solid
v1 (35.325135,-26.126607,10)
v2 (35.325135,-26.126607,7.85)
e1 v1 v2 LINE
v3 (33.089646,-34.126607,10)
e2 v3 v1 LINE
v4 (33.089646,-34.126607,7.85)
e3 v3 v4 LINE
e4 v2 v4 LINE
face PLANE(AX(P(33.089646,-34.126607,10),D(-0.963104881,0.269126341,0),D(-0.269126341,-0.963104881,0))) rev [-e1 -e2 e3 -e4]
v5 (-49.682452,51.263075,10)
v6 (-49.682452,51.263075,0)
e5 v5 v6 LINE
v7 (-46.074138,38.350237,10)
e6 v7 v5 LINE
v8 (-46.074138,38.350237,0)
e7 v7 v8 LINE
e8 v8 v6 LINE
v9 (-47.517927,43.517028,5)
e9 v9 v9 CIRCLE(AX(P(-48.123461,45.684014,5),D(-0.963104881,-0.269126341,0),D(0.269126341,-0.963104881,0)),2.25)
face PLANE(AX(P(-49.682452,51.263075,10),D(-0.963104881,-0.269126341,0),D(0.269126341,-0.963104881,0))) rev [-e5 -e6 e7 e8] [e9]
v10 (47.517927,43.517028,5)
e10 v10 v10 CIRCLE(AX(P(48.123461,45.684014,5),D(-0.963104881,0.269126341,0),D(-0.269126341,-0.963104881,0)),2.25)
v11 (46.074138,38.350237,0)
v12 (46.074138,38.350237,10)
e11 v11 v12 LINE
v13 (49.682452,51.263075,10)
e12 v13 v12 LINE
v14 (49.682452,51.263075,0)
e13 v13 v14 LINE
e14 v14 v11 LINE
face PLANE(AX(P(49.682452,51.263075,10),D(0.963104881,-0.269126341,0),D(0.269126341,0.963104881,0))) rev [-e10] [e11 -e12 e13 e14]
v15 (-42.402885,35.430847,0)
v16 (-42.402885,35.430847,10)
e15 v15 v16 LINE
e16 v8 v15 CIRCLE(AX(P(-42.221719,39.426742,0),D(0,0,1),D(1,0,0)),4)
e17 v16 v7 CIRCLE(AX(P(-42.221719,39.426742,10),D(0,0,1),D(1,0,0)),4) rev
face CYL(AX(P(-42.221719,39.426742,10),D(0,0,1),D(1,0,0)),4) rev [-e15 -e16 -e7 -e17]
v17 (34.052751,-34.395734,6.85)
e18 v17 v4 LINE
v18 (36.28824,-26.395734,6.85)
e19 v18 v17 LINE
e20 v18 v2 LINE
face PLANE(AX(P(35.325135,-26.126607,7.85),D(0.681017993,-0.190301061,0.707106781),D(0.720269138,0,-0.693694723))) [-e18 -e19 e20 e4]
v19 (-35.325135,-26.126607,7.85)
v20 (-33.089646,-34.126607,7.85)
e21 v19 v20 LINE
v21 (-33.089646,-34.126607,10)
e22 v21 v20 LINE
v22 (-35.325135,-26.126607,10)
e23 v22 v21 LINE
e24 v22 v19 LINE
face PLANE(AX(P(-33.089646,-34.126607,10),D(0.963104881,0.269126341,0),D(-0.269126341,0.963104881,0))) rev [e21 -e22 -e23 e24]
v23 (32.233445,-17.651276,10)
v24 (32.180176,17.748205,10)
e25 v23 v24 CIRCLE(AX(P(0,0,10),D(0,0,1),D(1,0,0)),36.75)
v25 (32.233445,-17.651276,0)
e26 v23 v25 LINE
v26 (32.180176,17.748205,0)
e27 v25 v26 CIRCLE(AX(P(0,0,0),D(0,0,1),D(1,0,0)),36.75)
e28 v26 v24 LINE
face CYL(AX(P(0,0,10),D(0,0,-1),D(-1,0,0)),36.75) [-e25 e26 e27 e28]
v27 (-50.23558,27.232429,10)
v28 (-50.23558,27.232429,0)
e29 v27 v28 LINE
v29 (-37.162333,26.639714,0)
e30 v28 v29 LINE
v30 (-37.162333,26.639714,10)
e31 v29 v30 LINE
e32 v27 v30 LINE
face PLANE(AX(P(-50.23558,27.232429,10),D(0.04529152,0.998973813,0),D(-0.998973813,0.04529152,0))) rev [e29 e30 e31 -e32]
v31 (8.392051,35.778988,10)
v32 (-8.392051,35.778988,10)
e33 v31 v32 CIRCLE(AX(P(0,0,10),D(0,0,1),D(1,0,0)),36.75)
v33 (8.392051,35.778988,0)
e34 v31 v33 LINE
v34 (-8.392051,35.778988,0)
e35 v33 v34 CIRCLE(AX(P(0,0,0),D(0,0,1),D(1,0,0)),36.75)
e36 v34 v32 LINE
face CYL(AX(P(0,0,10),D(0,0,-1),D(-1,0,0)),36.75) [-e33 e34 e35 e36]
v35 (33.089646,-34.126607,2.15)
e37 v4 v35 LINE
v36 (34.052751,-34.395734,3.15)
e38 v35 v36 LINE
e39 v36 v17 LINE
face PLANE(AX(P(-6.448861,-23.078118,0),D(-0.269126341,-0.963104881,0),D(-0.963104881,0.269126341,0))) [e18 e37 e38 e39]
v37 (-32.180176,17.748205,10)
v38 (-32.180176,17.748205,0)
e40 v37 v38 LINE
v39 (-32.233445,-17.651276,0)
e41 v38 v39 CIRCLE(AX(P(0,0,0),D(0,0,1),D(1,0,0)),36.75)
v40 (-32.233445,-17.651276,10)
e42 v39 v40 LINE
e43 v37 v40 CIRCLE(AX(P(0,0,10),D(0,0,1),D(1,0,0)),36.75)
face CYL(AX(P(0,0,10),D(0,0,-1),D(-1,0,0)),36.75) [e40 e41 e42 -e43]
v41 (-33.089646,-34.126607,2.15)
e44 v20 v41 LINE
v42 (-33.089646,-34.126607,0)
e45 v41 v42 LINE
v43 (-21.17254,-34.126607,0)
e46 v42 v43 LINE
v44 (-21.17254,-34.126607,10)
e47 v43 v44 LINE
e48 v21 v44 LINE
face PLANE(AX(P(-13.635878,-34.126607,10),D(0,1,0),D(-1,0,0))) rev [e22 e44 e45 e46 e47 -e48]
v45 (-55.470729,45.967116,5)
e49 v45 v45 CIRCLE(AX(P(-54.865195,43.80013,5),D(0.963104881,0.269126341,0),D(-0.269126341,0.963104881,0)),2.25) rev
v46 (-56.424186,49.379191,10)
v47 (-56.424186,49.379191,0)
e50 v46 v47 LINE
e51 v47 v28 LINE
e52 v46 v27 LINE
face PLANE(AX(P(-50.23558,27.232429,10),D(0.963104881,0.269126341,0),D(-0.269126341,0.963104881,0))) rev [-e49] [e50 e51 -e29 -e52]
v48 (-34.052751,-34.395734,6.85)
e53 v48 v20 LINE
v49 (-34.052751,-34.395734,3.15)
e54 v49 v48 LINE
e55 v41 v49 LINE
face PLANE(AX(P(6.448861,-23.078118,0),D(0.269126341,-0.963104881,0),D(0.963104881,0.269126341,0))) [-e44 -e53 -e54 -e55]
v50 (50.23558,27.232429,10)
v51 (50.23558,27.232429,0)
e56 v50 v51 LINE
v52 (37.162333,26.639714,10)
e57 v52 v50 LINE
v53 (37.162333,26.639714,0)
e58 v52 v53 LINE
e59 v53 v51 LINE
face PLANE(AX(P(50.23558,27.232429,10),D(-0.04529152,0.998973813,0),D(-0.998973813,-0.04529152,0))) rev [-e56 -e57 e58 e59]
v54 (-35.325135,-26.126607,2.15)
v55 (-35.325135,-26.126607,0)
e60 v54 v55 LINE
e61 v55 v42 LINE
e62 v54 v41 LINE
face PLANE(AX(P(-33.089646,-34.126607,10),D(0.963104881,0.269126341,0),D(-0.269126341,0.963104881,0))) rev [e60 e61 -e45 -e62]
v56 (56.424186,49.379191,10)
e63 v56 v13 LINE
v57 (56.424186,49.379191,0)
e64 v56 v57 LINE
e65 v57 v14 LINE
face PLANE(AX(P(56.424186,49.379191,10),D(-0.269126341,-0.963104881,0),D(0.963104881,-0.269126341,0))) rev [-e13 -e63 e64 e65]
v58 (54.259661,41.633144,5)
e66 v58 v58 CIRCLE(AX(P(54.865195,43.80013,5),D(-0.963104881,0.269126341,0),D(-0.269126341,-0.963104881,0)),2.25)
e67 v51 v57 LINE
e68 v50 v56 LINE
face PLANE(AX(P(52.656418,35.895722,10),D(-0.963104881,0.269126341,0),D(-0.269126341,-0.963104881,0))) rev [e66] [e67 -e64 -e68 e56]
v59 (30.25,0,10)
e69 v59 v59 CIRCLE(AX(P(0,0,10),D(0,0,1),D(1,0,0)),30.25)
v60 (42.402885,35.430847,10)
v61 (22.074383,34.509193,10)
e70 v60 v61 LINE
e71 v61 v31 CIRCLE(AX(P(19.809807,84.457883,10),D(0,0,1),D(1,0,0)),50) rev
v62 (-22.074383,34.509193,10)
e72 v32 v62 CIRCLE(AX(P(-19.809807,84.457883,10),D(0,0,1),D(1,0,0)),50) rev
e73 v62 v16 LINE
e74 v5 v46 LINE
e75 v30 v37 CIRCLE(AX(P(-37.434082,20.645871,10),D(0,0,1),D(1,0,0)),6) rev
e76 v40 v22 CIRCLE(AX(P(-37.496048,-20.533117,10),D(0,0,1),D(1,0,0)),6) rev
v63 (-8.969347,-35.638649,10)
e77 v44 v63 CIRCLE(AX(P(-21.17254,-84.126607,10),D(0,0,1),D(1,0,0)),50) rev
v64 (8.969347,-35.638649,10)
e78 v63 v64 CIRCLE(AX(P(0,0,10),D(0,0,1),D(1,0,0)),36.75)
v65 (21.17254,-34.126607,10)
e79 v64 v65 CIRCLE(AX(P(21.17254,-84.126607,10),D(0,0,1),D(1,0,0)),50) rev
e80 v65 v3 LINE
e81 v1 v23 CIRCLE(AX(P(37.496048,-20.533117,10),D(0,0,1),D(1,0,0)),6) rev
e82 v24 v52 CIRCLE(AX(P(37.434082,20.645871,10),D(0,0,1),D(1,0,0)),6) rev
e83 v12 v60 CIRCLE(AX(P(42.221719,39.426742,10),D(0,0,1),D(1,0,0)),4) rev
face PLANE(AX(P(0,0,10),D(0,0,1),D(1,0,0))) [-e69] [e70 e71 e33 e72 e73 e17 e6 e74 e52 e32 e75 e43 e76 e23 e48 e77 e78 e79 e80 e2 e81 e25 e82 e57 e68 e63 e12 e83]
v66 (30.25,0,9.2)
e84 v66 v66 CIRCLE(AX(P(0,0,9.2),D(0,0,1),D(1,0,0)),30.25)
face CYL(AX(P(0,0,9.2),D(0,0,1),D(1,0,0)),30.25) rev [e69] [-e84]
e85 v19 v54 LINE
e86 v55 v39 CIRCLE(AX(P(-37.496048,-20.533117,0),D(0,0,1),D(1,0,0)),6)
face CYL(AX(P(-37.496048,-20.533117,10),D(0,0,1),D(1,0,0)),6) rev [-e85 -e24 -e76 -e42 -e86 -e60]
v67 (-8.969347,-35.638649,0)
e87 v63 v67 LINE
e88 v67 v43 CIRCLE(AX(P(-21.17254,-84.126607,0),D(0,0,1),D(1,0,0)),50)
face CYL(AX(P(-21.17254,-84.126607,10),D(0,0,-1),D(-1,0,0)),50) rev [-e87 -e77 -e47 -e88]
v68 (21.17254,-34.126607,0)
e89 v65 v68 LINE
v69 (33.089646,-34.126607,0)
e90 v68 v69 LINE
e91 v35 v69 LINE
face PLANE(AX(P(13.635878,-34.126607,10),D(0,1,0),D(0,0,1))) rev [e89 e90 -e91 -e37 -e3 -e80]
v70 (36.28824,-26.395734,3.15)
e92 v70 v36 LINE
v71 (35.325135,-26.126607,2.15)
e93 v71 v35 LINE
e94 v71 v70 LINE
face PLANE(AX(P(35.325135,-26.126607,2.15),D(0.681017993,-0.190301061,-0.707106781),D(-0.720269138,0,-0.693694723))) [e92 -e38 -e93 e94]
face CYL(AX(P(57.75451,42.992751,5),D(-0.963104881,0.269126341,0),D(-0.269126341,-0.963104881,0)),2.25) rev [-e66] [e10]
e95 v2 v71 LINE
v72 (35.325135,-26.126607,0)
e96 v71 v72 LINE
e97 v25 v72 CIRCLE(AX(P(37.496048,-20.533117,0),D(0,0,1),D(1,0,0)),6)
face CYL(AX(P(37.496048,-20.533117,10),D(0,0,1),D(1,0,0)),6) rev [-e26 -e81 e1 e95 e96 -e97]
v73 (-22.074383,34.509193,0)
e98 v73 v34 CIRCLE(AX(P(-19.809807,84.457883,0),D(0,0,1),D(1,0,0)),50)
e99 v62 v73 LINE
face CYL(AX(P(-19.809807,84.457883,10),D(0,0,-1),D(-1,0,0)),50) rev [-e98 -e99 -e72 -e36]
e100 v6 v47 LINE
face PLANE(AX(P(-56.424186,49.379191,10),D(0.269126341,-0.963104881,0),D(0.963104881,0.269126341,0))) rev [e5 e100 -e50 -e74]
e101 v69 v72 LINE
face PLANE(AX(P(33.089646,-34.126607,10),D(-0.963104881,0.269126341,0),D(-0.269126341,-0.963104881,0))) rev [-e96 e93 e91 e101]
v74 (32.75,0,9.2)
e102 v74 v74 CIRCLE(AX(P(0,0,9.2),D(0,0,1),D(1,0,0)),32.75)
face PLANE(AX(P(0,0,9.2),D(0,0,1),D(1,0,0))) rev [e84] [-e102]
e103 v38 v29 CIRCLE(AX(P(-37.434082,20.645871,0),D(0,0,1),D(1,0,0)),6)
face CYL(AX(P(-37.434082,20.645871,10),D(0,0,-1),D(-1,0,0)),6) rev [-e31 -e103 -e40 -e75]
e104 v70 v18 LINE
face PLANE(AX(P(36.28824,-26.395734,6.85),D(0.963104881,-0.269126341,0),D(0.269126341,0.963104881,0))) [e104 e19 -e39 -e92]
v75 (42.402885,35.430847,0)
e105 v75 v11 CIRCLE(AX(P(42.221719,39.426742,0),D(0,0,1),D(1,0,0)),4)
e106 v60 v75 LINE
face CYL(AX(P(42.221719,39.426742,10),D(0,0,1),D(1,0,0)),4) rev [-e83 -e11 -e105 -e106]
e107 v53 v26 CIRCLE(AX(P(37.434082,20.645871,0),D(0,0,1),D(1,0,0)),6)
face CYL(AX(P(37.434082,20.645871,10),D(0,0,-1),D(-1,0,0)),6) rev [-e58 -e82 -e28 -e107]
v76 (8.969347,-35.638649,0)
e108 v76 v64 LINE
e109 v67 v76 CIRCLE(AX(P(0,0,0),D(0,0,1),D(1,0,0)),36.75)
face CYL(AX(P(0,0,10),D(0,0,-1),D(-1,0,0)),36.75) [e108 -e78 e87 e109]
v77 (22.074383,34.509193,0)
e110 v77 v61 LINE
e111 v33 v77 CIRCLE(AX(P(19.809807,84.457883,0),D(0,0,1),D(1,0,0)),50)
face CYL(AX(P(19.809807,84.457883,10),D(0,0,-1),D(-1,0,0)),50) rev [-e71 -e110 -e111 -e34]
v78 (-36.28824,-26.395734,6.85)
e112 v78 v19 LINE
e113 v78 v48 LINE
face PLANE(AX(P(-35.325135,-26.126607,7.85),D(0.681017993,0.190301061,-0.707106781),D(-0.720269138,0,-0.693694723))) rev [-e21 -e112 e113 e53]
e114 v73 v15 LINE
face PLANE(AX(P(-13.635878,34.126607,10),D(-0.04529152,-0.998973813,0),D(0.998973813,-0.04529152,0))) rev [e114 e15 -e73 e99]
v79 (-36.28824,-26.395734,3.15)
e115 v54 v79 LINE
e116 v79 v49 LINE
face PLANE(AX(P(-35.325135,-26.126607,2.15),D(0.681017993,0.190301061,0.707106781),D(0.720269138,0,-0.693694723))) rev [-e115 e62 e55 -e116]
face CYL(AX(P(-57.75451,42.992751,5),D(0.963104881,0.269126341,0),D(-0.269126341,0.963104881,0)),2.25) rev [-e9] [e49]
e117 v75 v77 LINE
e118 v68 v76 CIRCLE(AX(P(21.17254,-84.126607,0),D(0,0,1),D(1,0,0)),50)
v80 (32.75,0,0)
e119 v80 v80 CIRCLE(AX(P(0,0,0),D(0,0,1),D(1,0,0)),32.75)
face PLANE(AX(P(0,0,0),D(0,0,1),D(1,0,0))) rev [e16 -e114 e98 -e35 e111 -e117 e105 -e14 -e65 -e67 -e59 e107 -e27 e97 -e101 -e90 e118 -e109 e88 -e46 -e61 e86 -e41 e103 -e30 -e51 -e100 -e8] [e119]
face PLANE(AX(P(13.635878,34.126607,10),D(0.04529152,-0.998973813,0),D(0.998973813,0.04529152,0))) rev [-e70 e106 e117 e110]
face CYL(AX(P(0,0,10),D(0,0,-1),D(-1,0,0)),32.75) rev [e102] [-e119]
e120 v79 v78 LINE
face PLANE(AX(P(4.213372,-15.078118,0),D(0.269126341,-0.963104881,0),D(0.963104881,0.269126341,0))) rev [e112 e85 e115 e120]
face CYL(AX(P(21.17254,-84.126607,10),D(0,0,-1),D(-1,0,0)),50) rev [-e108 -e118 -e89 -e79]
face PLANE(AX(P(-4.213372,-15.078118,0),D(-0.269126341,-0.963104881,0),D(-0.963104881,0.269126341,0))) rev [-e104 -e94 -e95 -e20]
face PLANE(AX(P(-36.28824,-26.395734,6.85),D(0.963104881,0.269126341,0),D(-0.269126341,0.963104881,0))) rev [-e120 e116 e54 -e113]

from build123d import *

# Parameters (mm, degrees)
SKIZZE1_R                       = 32.75
AUFSATZ_LINEAR_AUSTRAGEN1_DEPTH = 10
AUFSATZ_LINEAR_START            = -0.8
SKIZZE2_R                       = 32.75
SKIZZE2_R_2                     = 30.25
AUFSATZ_LINEAR_AUSTRAGEN2_DEPTH = 0.8
SKIZZE5_R                       = 2.25
SCHNITT_LINEAR_AUSTRAGEN1_DEPTH = 10
VERRUNDUNG1_R                   = 50
VERRUNDUNG2_R                   = 6
VERRUNDUNG3_R                   = 4
AUFSATZ_LINEAR_AUSTRAGEN3_DEPTH = 8.306468


with BuildPart() as part:
    # Skizze1 → Aufsatz-Linear austragen1 (new body)
    with BuildSketch(Plane.XY):
        with BuildLine():
            Line((-13.635878322, -34.12660725), (-33.089645956, -34.12660725))
            Line((-33.089645956, -34.12660725), (-35.325135331, -26.12660725))
            Line((-35.325135331, -26.12660725), (-25.844978112, -26.12660725))
            ThreePointArc((-25.844978112, -26.12660725), (-36.75, 0), (-25.844978112, 26.12660725))
            Line((-25.844978112, 26.12660725), (-50.235580292, 27.232429468))
            Line((-50.235580292, 27.232429468), (-52.656417654, 35.895722216))
            Line((-52.656417654, 35.895722216), (-56.424186432, 49.379190555))
            Line((-56.424186432, 49.379190555), (-49.682452262, 51.263074944))
            Line((-49.682452262, 51.263074944), (-45.294995525, 35.561969729))
            Line((-45.294995525, 35.561969729), (-13.635878322, 34.12660725))
            ThreePointArc((-13.635878322, 34.12660725), (0, 36.75), (13.635878322, 34.12660725))
            Line((13.635878322, 34.12660725), (45.294995525, 35.561969729))
            Line((45.294995525, 35.561969729), (49.682452262, 51.263074944))
            Line((49.682452262, 51.263074944), (56.424186432, 49.379190555))
            Line((56.424186432, 49.379190555), (52.656417654, 35.895722216))
            Line((52.656417654, 35.895722216), (50.235580292, 27.232429468))
            Line((50.235580292, 27.232429468), (25.844978112, 26.12660725))
            ThreePointArc((25.844978112, 26.12660725), (36.75, 0), (25.844978112, -26.12660725))
            Line((25.844978112, -26.12660725), (35.325135331, -26.12660725))
            Line((35.325135331, -26.12660725), (33.089645956, -34.12660725))
            Line((33.089645956, -34.12660725), (13.635878322, -34.12660725))
            ThreePointArc((13.635878322, -34.12660725), (0, -36.75), (-13.635878322, -34.12660725))
        make_face()
        Circle(SKIZZE1_R, mode=Mode.SUBTRACT)
    extrude(amount=AUFSATZ_LINEAR_AUSTRAGEN1_DEPTH)

    # Skizze2 → Aufsatz-Linear austragen2 (add)
    with BuildSketch(Plane.XY.offset(10).offset(AUFSATZ_LINEAR_START)):
        Circle(SKIZZE2_R)
        Circle(SKIZZE2_R_2, mode=Mode.SUBTRACT)
    extrude(amount=AUFSATZ_LINEAR_AUSTRAGEN2_DEPTH)

    # Skizze5 → Schnitt-Linear austragen1 (cut)
    with BuildSketch(Plane(origin=(32.796772797, -9.164604643, 0), x_dir=(0, 0, 1), z_dir=(-0.9631048813334842, 0.2691263412444341, 0))):
        with Locations(Location((5, 56.94978804, 0), (0, 0, 270))):
            Circle(SKIZZE5_R)
    schnitt_linear_austragen1 = extrude(amount=-SCHNITT_LINEAR_AUSTRAGEN1_DEPTH, mode=Mode.SUBTRACT)

    # Spiegeln1: Schnitt-Linear austragen1 across plane
    add(schnitt_linear_austragen1.mirror(Plane(origin=(0, 0, 0), x_dir=(0, 0, 1), z_dir=(1, 0, 0))), mode=Mode.SUBTRACT)

    # Verrundung1
    verrundung1_edges = [part.edges().sort_by_distance(p)[0] for p in [
        (13.635878322, 34.12660725, 5),
        (13.635878322, -34.12660725, 5),
        (-13.635878322, -34.12660725, 5),
        (-13.635878322, 34.12660725, 5),
    ]]
    fillet(verrundung1_edges, radius=VERRUNDUNG1_R)

    # Verrundung2
    # the kernel refuses this fillet: 6 mm, written as the material it adds along each edge
    with BuildSketch(Plane(origin=(-25.844978112, -26.12660725, 0), x_dir=(-1, 0, 0), z_dir=(0, 0, 1))) as verrundung2_piece_1:
        with BuildLine():
            CenterArc((11.651069987, -5.593490659), VERRUNDUNG2_R, 111.211936516, 97.493506366)
            Line((6.388466745, -8.475331584), (6.283214681, -8.532968403))
            ThreePointArc((6.283214681, -8.532968403), (3.405977683, -4.078058883), (-0.084391765, -0.085311371))
            Line((-0.084391765, -0.085311371), (0, 0.12))
            ThreePointArc((0, 0.12), (4.74007861, 0.12), (9.436738964, 0.111869813))
            Line((9.436738964, 0.111869813), (9.48015722, 0))
        make_face()
    extrude(amount=10)
    with BuildSketch(Plane(origin=(25.844978112, -26.12660725, 0), x_dir=(1, 0, 0), z_dir=(0, 0, 1))) as verrundung2_piece_2:
        with BuildLine():
            CenterArc((11.651069987, 5.593490659), VERRUNDUNG2_R, 151.294557118, 97.493506366)
            Line((6.388466745, 8.475331584), (6.283214681, 8.532968403))
            ThreePointArc((6.283214681, 8.532968403), (3.405977683, 4.078058883), (-0.084391765, 0.085311371))
            Line((-0.084391765, 0.085311371), (0, -0.12))
            ThreePointArc((0, -0.12), (4.74007861, -0.12), (9.436738964, -0.111869813))
            Line((9.436738964, -0.111869813), (9.48015722, 0))
        make_face()
    extrude(amount=10)
    with BuildSketch(Plane(origin=(25.844978112, 26.12660725, 0), x_dir=(0.603126946859045, -0.7976452130944475, 0), z_dir=(0, 0, 1))) as verrundung2_piece_3:
        with BuildLine():
            CenterArc((11.361383868, 5.938413704), VERRUNDUNG2_R, 145.501722428, 116.281978681)
            Line((6.416524574, 9.336702474), (6.317627388, 9.40466825))
            Line((6.317627388, 9.40466825), (-0.098897186, 0.067965775))
            Line((-0.098897186, 0.067965775), (0.017149259, -0.118768274))
            ThreePointArc((0.017149259, -0.118768274), (5.251960467, 0.257216064), (10.486771676, -0.118768274))
            Line((10.486771676, -0.118768274), (10.503920934, 0))
        make_face()
    extrude(amount=10)
    with BuildSketch(Plane(origin=(-25.844978112, 26.12660725, 0), x_dir=(-0.6031269468590452, -0.7976452130944475, 0), z_dir=(0, 0, 1))) as verrundung2_piece_4:
        with BuildLine():
            CenterArc((11.361383868, -5.938413704), VERRUNDUNG2_R, 98.216298891, 116.281978681)
            Line((6.416524574, -9.336702474), (6.317627388, -9.40466825))
            Line((6.317627388, -9.40466825), (-0.098897186, -0.067965775))
            Line((-0.098897186, -0.067965775), (0.017149259, 0.118768274))
            ThreePointArc((0.017149259, 0.118768274), (5.251960467, -0.257216064), (10.486771676, 0.118768274))
            Line((10.486771676, 0.118768274), (10.503920934, 0))
        make_face()
    extrude(amount=10)

    # Verrundung3
    verrundung3_edges = [part.edges().sort_by_distance(p)[0] for p in [
        (45.294995525, 35.561969729, 5),
        (-45.294995525, 35.561969729, 5),
    ]]
    fillet(verrundung3_edges, radius=VERRUNDUNG3_R)

    # Skizze6 → Aufsatz-Linear austragen3 (add)
    with BuildSketch(Plane(origin=(6.448861011, -23.078118218, 0), x_dir=(0, 0, -1), z_dir=(-0.26912634124443396, 0.9631048813334842, 0))):
        Polygon((-7.85, 41.05316849), (-6.85, 42.05316849), (-3.15, 42.05316849), (-2.15, 41.05316849), align=None)
    aufsatz_linear_austragen3 = extrude(amount=AUFSATZ_LINEAR_AUSTRAGEN3_DEPTH)

    # Spiegeln2: Aufsatz-Linear austragen3 across plane
    add(aufsatz_linear_austragen3.mirror(Plane(origin=(0, 0, 0), x_dir=(0, 0, 1), z_dir=(1, 0, 0))))


solid = part.part
